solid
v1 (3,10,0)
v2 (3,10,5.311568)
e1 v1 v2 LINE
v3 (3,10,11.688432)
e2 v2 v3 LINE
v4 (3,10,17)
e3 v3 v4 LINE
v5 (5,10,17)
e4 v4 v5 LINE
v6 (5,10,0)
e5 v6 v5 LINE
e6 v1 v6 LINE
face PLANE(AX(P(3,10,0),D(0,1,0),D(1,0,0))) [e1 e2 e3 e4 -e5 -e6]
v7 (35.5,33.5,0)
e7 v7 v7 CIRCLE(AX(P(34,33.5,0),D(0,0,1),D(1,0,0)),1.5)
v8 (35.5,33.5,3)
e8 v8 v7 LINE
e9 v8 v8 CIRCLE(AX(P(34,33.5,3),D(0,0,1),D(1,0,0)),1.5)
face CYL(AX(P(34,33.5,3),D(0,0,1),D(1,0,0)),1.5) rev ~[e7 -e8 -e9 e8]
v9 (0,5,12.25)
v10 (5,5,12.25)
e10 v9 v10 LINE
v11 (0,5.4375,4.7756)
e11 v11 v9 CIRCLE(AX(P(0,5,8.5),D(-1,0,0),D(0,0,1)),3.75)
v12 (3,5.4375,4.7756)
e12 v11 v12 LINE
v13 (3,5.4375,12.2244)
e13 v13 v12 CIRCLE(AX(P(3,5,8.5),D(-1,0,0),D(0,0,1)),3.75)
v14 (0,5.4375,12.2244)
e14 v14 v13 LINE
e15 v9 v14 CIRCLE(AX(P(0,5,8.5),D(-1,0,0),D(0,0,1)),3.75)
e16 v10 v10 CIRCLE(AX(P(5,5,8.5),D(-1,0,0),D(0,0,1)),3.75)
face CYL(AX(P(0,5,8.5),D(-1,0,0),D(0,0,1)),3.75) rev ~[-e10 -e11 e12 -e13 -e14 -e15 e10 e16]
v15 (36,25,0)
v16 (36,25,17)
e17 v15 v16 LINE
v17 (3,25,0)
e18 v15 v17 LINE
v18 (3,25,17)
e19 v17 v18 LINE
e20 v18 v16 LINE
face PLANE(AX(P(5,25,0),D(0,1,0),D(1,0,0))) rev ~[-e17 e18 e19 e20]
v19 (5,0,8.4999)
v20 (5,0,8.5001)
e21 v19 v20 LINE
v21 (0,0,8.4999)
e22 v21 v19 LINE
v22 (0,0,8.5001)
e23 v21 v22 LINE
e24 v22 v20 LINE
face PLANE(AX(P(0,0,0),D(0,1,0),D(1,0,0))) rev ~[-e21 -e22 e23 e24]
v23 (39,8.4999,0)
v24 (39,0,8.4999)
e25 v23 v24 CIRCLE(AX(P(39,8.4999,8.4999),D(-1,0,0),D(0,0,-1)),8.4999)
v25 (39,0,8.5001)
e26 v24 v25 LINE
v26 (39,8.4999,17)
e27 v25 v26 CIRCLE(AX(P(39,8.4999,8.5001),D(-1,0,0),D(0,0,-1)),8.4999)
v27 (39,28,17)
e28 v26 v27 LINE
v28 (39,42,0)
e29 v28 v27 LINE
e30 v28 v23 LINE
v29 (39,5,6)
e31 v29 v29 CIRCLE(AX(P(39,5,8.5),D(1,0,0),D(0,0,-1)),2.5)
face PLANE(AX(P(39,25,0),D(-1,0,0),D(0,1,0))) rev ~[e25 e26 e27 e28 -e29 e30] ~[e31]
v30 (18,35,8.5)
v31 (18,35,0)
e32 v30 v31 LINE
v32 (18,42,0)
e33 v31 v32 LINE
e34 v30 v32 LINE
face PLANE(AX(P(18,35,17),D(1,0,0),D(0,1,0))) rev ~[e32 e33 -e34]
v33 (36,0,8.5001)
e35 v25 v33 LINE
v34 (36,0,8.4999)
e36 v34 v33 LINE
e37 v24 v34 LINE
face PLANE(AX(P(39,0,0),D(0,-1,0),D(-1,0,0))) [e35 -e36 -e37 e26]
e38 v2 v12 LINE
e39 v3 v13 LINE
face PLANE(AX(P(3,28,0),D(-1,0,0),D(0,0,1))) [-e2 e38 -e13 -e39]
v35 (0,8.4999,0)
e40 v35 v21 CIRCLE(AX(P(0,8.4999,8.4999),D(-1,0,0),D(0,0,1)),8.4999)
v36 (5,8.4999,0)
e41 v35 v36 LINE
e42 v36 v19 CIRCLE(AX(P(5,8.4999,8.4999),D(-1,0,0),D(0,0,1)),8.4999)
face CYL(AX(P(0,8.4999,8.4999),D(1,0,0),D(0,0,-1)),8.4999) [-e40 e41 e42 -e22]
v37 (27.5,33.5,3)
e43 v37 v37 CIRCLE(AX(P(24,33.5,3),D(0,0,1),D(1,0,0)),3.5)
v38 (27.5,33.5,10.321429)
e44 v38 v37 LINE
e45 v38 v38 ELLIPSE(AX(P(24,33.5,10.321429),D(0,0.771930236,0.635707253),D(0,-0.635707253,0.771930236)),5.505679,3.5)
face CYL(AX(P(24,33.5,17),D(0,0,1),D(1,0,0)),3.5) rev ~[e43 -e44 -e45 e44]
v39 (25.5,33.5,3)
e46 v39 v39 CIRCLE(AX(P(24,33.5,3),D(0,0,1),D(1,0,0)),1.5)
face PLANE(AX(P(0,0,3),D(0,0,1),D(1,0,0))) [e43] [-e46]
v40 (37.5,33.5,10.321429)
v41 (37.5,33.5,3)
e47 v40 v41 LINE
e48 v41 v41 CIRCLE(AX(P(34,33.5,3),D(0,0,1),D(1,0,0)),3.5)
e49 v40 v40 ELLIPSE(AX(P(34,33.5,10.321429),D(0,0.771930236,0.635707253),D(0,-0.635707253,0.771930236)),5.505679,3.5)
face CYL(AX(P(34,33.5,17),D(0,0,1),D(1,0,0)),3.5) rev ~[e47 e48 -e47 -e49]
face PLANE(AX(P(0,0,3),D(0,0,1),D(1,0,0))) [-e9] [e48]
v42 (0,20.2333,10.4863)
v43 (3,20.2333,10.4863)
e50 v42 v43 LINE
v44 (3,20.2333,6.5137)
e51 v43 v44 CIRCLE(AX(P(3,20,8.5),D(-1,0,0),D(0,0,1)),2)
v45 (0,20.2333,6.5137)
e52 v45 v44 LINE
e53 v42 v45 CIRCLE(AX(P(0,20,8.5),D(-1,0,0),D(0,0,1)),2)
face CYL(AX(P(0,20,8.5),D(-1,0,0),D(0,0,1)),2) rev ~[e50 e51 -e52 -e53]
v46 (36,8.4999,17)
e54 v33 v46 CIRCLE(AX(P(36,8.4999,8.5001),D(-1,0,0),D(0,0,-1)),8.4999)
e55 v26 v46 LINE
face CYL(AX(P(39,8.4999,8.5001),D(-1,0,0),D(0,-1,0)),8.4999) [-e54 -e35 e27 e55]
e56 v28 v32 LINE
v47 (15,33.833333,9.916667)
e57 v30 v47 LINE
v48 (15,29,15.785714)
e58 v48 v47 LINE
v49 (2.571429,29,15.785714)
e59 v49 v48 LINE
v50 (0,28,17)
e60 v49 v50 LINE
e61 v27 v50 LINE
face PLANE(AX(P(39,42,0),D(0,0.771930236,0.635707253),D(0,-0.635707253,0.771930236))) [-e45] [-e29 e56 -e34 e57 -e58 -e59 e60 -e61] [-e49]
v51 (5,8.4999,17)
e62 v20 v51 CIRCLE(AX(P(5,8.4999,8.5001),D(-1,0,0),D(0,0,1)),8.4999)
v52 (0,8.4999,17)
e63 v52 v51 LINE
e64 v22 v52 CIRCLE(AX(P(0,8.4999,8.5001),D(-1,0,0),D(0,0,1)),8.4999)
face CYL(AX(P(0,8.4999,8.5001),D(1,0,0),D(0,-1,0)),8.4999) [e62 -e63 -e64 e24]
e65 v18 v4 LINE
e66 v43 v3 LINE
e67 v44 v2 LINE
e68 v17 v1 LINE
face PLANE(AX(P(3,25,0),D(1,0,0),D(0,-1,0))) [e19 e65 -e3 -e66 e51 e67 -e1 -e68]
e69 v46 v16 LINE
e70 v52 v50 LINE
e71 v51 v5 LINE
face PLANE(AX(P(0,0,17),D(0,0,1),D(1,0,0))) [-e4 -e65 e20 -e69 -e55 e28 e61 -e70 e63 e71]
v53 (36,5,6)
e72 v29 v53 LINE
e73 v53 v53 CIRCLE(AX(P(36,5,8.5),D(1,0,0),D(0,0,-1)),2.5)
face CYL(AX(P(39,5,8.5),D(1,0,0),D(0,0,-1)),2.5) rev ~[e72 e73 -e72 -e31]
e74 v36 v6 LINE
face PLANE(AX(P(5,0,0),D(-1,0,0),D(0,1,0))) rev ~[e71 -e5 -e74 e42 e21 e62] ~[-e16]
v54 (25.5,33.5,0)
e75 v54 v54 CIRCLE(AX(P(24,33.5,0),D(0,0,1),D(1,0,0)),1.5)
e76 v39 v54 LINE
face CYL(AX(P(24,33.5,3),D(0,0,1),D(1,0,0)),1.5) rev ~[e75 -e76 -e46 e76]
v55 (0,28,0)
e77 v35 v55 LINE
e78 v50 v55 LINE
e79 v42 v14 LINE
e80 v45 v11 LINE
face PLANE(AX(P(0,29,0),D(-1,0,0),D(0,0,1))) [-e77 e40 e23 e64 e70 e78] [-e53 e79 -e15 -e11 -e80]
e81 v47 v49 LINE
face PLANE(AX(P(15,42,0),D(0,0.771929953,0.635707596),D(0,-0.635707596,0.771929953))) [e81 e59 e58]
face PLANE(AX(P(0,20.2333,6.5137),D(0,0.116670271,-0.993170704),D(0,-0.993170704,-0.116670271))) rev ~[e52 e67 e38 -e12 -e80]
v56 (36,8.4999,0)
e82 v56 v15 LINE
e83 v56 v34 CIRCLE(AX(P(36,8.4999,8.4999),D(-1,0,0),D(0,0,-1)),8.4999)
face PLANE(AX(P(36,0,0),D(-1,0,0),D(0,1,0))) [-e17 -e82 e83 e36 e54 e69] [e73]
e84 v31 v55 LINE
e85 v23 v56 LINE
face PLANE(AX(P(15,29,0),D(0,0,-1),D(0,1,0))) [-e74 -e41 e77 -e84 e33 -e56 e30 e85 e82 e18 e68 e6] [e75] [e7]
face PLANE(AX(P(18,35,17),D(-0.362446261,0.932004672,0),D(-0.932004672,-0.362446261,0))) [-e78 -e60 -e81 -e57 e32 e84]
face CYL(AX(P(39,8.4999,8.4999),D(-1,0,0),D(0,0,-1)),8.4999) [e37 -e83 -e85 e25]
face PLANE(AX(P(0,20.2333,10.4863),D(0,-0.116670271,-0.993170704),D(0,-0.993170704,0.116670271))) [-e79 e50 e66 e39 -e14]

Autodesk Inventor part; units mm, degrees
ref_plane "YZ Plane" through (0, 0, 0) normal (1, 0, 0) x (0, 1, 0)
ref_plane "XZ Plane" through (0, 0, 0) normal (0, 1, 0) x (-1, 0, 0)
ref_plane "XY Plane" through (0, 0, 0) normal (0, 0, 1) x (1, 0, 0)
sketch "Sketch1" plane through (0, 0, 0) normal (0, 0, 1) x (1, 0, 0)
  line L0 (0, 0) -> (5, 0)
  line L1 (5, 0) -> (5, 25)
  line L2 (5, 25) -> (0, 25)
  line L3 (0, 25) -> (0, 0)
  line L4 (36, 25) -> (39, 25)
  line L5 (39, 25) -> (39, 0)
  line L6 (39, 0) -> (36, 0)
  line L7 (36, 0) -> (36, 25)
  line L8 (0, 25) -> (39, 25)
  line L9 (39, 25) -> (39, 42)
  line L10 (39, 42) -> (0, 42)
  line L11 (0, 42) -> (0, 25)
  line L12 (5, 25) -> (3, 25)
  line L13 (3, 25) -> (3, 10)
  line L14 (3, 10) -> (5, 10)
  line L15 (5, 10) -> (5, 25)
  dimension "d0" = 5
  dimension "d1" = 25
  dimension "d2" = 3
  dimension "d3" = 25
  dimension "d4" = 31
  dimension "d6" = 17
  dimension "d48" = 0
  dimension "d54" = 2
  dimension "d55" = 15
extrude "Extrusion1" add sketch "Sketch1" along normal blind 17 contours L3 L2 L13 L14 L1 L0 | L11 L10 L9 L4 L8 L2 | L4 L5 L6 L7
sketch "Sketch2" plane through (39, 0, 0) normal (1, 0, 0) x (0, 0, -1)
  line L0 (-17, 28) -> (-17, 42)
  line L1 (0, 42) -> (-17, 42) projected
  line L2 (-17, 42) -> (0, 42)
  line L3 (0, 42) -> (-17, 28)
  point P0 (0, 0)
  dimension "d9" = 14
extrude "Extrusion2" cut sketch "Sketch2" against normal up to surface (39 mm away)
sketch "Sketch3" plane through (0, 0, 0) normal (0, 0, -1) x (-1, 0, 0)
  line L0 (0, 42) -> (0, 0) projected
  line L1 (0, 42) -> (-15, 42)
  line L2 (-15, 42) -> (-15, 29)
  line L3 (-15, 29) -> (0, 29)
  line L4 (0, 29) -> (0, 42)
  point P0 (0, 29)
  dimension "d12" = 15
  dimension "d13" = 13
extrude "Extrusion3" cut sketch "Sketch3" against normal up to surface (17 mm away)
sketch "Sketch4" plane through (0, 0, 17) normal (0, 0, 1) x (1, 0, 0)
  line L0 (39, 0) -> (39, 42) projected
  line L1 (39, 42) -> (19, 42)
  line L2 (19, 42) -> (19, 25)
  line L3 (19, 25) -> (39, 25)
  line L4 (39, 25) -> (39, 42)
  circle A0 centre (34, 33.5) radius 3.5
  circle A1 centre (24, 33.5) radius 3.5
  point P0 (0, 0)
  dimension "d16" = 20
  dimension "d17" = 17
  dimension "d18" = 7
  dimension "d19" = 7
  dimension "d20" = 8.5
  dimension "d21" = 5
  dimension "d22" = 8.5
  dimension "d23" = 5
extrude "Extrusion4" cut sketch "Sketch4" against normal blind 14 contours A0 | A1
sketch "Sketch5" plane through (0, 0, 3) normal (0, 0, 1) x (1, 0, 0)
  circle A0 centre (34, 33.5) radius 3.5 projected
  circle A1 centre (34, 33.5) radius 1.5
  circle A2 centre (24, 33.5) radius 3.5 projected
  circle A3 centre (24, 33.5) radius 1.5
  point P0 (0, 0)
  point P1 (32.4191, 39.5294)
  point P2 (27.5809, 39.5294)
  point P3 (22.4191, 39.5294)
  point P4 (17.5809, 39.5294)
  dimension "d26" = 3
  dimension "d27" = 3
extrude "Extrusion5" cut sketch "Sketch5" against normal up to surface (3 mm away) contours A1 | A3
sketch "Sketch6" plane through (15, 29, 0) normal (-1, 0, 0) x (0, 0, 1)
  line L0 (0, 0) -> (15.7857, 0) projected
  line L1 (0, 13) -> (15.7857, 0)
  line L2 (15.7857, 0) -> (0, 0)
  line L3 (0, 0) -> (0, 13)
  line L4 (0, 0) -> (0, 13) projected
  point P0 (0, -29)
extrude "Extrusion6" add sketch "Sketch6" along normal up to surface (15 mm away)
sketch "Sketch7" plane through (0, 0, 17) normal (0, 0, 1) x (1, 0, 0)
  line L0 (39, 28) -> (0, 28) projected
  line L1 (0, 28) -> (18, 28)
  line L2 (18, 28) -> (18, 35)
  line L3 (18, 35) -> (0, 28)
  line L4 (18, 35) -> (18, 42)
  line L5 (0, 28) -> (0, 42) projected
  line L6 (18, 42) -> (0, 42)
  line L7 (0, 42) -> (0, 28)
  point P0 (0, 0)
  dimension "d32" = 18
  dimension "d33" = 7
  dimension "d34" = 7
extrude "Extrusion7" cut sketch "Sketch7" against normal up to surface (17 mm away) contours L5 L6 L4 L3
sketch "Sketch8" plane through (0, 0, 0) normal (-1, 0, 0) x (0, 0, 1)
  circle A0 centre (8.5, 5) radius 3.75
  line L0 (0, 0) -> (17, 0) projected
  line L1 (17, 28) -> (17, 0) projected
  dimension "d37" = 7.5
  dimension "d38" = 5
  dimension "d39" = 8.5
extrude "Extrusion8" cut sketch "Sketch8" against normal up to surface (5 mm away)
sketch "Sketch9" plane through (39, 0, 17) normal (1, 0, 0) x (0, 0, -1)
  circle A0 centre (8.5, 5) radius 2.5
  line L0 (17, 0) -> (0, 0) projected
  line L1 (0, 0) -> (0, 28) projected
  dimension "d42" = 5
  dimension "d43" = 5
  dimension "d44" = 8.5
extrude "Extrusion9" cut sketch "Sketch9" against normal up to surface (3 mm away)
fillet "Fillet1" radius 8.5 4 edges at (2.5, 0, 17) (37.5, 0, 17) (37.5, 0, 0) (2.5, 0, 0)
sketch "Sketch10" plane through (0, 28, 0) normal (-1, 0, 0) x (0, 0, 1)
  circle A0 centre (8.5, -8) radius 2
  circle A1 centre (8.5, -23) radius 3.75
  line L0 (10.4863, -7.7667) -> (12.2244, -22.5625)
  line L1 (6.5137, -7.7667) -> (4.7756, -22.5625)
  circle A2 centre (8.5, -23) radius 3.75 projected
  circle A3 centre (8.5, -23) radius 3.5
  point P0 (0, -28)
  dimension "d49" = 4
  dimension "d50" = 15
  dimension "d51" = 0
extrude "Extrusion10" cut sketch "Sketch10" against normal blind 3 contours A0 | A0 L0 A1 L1
properties part number "juncao7"
